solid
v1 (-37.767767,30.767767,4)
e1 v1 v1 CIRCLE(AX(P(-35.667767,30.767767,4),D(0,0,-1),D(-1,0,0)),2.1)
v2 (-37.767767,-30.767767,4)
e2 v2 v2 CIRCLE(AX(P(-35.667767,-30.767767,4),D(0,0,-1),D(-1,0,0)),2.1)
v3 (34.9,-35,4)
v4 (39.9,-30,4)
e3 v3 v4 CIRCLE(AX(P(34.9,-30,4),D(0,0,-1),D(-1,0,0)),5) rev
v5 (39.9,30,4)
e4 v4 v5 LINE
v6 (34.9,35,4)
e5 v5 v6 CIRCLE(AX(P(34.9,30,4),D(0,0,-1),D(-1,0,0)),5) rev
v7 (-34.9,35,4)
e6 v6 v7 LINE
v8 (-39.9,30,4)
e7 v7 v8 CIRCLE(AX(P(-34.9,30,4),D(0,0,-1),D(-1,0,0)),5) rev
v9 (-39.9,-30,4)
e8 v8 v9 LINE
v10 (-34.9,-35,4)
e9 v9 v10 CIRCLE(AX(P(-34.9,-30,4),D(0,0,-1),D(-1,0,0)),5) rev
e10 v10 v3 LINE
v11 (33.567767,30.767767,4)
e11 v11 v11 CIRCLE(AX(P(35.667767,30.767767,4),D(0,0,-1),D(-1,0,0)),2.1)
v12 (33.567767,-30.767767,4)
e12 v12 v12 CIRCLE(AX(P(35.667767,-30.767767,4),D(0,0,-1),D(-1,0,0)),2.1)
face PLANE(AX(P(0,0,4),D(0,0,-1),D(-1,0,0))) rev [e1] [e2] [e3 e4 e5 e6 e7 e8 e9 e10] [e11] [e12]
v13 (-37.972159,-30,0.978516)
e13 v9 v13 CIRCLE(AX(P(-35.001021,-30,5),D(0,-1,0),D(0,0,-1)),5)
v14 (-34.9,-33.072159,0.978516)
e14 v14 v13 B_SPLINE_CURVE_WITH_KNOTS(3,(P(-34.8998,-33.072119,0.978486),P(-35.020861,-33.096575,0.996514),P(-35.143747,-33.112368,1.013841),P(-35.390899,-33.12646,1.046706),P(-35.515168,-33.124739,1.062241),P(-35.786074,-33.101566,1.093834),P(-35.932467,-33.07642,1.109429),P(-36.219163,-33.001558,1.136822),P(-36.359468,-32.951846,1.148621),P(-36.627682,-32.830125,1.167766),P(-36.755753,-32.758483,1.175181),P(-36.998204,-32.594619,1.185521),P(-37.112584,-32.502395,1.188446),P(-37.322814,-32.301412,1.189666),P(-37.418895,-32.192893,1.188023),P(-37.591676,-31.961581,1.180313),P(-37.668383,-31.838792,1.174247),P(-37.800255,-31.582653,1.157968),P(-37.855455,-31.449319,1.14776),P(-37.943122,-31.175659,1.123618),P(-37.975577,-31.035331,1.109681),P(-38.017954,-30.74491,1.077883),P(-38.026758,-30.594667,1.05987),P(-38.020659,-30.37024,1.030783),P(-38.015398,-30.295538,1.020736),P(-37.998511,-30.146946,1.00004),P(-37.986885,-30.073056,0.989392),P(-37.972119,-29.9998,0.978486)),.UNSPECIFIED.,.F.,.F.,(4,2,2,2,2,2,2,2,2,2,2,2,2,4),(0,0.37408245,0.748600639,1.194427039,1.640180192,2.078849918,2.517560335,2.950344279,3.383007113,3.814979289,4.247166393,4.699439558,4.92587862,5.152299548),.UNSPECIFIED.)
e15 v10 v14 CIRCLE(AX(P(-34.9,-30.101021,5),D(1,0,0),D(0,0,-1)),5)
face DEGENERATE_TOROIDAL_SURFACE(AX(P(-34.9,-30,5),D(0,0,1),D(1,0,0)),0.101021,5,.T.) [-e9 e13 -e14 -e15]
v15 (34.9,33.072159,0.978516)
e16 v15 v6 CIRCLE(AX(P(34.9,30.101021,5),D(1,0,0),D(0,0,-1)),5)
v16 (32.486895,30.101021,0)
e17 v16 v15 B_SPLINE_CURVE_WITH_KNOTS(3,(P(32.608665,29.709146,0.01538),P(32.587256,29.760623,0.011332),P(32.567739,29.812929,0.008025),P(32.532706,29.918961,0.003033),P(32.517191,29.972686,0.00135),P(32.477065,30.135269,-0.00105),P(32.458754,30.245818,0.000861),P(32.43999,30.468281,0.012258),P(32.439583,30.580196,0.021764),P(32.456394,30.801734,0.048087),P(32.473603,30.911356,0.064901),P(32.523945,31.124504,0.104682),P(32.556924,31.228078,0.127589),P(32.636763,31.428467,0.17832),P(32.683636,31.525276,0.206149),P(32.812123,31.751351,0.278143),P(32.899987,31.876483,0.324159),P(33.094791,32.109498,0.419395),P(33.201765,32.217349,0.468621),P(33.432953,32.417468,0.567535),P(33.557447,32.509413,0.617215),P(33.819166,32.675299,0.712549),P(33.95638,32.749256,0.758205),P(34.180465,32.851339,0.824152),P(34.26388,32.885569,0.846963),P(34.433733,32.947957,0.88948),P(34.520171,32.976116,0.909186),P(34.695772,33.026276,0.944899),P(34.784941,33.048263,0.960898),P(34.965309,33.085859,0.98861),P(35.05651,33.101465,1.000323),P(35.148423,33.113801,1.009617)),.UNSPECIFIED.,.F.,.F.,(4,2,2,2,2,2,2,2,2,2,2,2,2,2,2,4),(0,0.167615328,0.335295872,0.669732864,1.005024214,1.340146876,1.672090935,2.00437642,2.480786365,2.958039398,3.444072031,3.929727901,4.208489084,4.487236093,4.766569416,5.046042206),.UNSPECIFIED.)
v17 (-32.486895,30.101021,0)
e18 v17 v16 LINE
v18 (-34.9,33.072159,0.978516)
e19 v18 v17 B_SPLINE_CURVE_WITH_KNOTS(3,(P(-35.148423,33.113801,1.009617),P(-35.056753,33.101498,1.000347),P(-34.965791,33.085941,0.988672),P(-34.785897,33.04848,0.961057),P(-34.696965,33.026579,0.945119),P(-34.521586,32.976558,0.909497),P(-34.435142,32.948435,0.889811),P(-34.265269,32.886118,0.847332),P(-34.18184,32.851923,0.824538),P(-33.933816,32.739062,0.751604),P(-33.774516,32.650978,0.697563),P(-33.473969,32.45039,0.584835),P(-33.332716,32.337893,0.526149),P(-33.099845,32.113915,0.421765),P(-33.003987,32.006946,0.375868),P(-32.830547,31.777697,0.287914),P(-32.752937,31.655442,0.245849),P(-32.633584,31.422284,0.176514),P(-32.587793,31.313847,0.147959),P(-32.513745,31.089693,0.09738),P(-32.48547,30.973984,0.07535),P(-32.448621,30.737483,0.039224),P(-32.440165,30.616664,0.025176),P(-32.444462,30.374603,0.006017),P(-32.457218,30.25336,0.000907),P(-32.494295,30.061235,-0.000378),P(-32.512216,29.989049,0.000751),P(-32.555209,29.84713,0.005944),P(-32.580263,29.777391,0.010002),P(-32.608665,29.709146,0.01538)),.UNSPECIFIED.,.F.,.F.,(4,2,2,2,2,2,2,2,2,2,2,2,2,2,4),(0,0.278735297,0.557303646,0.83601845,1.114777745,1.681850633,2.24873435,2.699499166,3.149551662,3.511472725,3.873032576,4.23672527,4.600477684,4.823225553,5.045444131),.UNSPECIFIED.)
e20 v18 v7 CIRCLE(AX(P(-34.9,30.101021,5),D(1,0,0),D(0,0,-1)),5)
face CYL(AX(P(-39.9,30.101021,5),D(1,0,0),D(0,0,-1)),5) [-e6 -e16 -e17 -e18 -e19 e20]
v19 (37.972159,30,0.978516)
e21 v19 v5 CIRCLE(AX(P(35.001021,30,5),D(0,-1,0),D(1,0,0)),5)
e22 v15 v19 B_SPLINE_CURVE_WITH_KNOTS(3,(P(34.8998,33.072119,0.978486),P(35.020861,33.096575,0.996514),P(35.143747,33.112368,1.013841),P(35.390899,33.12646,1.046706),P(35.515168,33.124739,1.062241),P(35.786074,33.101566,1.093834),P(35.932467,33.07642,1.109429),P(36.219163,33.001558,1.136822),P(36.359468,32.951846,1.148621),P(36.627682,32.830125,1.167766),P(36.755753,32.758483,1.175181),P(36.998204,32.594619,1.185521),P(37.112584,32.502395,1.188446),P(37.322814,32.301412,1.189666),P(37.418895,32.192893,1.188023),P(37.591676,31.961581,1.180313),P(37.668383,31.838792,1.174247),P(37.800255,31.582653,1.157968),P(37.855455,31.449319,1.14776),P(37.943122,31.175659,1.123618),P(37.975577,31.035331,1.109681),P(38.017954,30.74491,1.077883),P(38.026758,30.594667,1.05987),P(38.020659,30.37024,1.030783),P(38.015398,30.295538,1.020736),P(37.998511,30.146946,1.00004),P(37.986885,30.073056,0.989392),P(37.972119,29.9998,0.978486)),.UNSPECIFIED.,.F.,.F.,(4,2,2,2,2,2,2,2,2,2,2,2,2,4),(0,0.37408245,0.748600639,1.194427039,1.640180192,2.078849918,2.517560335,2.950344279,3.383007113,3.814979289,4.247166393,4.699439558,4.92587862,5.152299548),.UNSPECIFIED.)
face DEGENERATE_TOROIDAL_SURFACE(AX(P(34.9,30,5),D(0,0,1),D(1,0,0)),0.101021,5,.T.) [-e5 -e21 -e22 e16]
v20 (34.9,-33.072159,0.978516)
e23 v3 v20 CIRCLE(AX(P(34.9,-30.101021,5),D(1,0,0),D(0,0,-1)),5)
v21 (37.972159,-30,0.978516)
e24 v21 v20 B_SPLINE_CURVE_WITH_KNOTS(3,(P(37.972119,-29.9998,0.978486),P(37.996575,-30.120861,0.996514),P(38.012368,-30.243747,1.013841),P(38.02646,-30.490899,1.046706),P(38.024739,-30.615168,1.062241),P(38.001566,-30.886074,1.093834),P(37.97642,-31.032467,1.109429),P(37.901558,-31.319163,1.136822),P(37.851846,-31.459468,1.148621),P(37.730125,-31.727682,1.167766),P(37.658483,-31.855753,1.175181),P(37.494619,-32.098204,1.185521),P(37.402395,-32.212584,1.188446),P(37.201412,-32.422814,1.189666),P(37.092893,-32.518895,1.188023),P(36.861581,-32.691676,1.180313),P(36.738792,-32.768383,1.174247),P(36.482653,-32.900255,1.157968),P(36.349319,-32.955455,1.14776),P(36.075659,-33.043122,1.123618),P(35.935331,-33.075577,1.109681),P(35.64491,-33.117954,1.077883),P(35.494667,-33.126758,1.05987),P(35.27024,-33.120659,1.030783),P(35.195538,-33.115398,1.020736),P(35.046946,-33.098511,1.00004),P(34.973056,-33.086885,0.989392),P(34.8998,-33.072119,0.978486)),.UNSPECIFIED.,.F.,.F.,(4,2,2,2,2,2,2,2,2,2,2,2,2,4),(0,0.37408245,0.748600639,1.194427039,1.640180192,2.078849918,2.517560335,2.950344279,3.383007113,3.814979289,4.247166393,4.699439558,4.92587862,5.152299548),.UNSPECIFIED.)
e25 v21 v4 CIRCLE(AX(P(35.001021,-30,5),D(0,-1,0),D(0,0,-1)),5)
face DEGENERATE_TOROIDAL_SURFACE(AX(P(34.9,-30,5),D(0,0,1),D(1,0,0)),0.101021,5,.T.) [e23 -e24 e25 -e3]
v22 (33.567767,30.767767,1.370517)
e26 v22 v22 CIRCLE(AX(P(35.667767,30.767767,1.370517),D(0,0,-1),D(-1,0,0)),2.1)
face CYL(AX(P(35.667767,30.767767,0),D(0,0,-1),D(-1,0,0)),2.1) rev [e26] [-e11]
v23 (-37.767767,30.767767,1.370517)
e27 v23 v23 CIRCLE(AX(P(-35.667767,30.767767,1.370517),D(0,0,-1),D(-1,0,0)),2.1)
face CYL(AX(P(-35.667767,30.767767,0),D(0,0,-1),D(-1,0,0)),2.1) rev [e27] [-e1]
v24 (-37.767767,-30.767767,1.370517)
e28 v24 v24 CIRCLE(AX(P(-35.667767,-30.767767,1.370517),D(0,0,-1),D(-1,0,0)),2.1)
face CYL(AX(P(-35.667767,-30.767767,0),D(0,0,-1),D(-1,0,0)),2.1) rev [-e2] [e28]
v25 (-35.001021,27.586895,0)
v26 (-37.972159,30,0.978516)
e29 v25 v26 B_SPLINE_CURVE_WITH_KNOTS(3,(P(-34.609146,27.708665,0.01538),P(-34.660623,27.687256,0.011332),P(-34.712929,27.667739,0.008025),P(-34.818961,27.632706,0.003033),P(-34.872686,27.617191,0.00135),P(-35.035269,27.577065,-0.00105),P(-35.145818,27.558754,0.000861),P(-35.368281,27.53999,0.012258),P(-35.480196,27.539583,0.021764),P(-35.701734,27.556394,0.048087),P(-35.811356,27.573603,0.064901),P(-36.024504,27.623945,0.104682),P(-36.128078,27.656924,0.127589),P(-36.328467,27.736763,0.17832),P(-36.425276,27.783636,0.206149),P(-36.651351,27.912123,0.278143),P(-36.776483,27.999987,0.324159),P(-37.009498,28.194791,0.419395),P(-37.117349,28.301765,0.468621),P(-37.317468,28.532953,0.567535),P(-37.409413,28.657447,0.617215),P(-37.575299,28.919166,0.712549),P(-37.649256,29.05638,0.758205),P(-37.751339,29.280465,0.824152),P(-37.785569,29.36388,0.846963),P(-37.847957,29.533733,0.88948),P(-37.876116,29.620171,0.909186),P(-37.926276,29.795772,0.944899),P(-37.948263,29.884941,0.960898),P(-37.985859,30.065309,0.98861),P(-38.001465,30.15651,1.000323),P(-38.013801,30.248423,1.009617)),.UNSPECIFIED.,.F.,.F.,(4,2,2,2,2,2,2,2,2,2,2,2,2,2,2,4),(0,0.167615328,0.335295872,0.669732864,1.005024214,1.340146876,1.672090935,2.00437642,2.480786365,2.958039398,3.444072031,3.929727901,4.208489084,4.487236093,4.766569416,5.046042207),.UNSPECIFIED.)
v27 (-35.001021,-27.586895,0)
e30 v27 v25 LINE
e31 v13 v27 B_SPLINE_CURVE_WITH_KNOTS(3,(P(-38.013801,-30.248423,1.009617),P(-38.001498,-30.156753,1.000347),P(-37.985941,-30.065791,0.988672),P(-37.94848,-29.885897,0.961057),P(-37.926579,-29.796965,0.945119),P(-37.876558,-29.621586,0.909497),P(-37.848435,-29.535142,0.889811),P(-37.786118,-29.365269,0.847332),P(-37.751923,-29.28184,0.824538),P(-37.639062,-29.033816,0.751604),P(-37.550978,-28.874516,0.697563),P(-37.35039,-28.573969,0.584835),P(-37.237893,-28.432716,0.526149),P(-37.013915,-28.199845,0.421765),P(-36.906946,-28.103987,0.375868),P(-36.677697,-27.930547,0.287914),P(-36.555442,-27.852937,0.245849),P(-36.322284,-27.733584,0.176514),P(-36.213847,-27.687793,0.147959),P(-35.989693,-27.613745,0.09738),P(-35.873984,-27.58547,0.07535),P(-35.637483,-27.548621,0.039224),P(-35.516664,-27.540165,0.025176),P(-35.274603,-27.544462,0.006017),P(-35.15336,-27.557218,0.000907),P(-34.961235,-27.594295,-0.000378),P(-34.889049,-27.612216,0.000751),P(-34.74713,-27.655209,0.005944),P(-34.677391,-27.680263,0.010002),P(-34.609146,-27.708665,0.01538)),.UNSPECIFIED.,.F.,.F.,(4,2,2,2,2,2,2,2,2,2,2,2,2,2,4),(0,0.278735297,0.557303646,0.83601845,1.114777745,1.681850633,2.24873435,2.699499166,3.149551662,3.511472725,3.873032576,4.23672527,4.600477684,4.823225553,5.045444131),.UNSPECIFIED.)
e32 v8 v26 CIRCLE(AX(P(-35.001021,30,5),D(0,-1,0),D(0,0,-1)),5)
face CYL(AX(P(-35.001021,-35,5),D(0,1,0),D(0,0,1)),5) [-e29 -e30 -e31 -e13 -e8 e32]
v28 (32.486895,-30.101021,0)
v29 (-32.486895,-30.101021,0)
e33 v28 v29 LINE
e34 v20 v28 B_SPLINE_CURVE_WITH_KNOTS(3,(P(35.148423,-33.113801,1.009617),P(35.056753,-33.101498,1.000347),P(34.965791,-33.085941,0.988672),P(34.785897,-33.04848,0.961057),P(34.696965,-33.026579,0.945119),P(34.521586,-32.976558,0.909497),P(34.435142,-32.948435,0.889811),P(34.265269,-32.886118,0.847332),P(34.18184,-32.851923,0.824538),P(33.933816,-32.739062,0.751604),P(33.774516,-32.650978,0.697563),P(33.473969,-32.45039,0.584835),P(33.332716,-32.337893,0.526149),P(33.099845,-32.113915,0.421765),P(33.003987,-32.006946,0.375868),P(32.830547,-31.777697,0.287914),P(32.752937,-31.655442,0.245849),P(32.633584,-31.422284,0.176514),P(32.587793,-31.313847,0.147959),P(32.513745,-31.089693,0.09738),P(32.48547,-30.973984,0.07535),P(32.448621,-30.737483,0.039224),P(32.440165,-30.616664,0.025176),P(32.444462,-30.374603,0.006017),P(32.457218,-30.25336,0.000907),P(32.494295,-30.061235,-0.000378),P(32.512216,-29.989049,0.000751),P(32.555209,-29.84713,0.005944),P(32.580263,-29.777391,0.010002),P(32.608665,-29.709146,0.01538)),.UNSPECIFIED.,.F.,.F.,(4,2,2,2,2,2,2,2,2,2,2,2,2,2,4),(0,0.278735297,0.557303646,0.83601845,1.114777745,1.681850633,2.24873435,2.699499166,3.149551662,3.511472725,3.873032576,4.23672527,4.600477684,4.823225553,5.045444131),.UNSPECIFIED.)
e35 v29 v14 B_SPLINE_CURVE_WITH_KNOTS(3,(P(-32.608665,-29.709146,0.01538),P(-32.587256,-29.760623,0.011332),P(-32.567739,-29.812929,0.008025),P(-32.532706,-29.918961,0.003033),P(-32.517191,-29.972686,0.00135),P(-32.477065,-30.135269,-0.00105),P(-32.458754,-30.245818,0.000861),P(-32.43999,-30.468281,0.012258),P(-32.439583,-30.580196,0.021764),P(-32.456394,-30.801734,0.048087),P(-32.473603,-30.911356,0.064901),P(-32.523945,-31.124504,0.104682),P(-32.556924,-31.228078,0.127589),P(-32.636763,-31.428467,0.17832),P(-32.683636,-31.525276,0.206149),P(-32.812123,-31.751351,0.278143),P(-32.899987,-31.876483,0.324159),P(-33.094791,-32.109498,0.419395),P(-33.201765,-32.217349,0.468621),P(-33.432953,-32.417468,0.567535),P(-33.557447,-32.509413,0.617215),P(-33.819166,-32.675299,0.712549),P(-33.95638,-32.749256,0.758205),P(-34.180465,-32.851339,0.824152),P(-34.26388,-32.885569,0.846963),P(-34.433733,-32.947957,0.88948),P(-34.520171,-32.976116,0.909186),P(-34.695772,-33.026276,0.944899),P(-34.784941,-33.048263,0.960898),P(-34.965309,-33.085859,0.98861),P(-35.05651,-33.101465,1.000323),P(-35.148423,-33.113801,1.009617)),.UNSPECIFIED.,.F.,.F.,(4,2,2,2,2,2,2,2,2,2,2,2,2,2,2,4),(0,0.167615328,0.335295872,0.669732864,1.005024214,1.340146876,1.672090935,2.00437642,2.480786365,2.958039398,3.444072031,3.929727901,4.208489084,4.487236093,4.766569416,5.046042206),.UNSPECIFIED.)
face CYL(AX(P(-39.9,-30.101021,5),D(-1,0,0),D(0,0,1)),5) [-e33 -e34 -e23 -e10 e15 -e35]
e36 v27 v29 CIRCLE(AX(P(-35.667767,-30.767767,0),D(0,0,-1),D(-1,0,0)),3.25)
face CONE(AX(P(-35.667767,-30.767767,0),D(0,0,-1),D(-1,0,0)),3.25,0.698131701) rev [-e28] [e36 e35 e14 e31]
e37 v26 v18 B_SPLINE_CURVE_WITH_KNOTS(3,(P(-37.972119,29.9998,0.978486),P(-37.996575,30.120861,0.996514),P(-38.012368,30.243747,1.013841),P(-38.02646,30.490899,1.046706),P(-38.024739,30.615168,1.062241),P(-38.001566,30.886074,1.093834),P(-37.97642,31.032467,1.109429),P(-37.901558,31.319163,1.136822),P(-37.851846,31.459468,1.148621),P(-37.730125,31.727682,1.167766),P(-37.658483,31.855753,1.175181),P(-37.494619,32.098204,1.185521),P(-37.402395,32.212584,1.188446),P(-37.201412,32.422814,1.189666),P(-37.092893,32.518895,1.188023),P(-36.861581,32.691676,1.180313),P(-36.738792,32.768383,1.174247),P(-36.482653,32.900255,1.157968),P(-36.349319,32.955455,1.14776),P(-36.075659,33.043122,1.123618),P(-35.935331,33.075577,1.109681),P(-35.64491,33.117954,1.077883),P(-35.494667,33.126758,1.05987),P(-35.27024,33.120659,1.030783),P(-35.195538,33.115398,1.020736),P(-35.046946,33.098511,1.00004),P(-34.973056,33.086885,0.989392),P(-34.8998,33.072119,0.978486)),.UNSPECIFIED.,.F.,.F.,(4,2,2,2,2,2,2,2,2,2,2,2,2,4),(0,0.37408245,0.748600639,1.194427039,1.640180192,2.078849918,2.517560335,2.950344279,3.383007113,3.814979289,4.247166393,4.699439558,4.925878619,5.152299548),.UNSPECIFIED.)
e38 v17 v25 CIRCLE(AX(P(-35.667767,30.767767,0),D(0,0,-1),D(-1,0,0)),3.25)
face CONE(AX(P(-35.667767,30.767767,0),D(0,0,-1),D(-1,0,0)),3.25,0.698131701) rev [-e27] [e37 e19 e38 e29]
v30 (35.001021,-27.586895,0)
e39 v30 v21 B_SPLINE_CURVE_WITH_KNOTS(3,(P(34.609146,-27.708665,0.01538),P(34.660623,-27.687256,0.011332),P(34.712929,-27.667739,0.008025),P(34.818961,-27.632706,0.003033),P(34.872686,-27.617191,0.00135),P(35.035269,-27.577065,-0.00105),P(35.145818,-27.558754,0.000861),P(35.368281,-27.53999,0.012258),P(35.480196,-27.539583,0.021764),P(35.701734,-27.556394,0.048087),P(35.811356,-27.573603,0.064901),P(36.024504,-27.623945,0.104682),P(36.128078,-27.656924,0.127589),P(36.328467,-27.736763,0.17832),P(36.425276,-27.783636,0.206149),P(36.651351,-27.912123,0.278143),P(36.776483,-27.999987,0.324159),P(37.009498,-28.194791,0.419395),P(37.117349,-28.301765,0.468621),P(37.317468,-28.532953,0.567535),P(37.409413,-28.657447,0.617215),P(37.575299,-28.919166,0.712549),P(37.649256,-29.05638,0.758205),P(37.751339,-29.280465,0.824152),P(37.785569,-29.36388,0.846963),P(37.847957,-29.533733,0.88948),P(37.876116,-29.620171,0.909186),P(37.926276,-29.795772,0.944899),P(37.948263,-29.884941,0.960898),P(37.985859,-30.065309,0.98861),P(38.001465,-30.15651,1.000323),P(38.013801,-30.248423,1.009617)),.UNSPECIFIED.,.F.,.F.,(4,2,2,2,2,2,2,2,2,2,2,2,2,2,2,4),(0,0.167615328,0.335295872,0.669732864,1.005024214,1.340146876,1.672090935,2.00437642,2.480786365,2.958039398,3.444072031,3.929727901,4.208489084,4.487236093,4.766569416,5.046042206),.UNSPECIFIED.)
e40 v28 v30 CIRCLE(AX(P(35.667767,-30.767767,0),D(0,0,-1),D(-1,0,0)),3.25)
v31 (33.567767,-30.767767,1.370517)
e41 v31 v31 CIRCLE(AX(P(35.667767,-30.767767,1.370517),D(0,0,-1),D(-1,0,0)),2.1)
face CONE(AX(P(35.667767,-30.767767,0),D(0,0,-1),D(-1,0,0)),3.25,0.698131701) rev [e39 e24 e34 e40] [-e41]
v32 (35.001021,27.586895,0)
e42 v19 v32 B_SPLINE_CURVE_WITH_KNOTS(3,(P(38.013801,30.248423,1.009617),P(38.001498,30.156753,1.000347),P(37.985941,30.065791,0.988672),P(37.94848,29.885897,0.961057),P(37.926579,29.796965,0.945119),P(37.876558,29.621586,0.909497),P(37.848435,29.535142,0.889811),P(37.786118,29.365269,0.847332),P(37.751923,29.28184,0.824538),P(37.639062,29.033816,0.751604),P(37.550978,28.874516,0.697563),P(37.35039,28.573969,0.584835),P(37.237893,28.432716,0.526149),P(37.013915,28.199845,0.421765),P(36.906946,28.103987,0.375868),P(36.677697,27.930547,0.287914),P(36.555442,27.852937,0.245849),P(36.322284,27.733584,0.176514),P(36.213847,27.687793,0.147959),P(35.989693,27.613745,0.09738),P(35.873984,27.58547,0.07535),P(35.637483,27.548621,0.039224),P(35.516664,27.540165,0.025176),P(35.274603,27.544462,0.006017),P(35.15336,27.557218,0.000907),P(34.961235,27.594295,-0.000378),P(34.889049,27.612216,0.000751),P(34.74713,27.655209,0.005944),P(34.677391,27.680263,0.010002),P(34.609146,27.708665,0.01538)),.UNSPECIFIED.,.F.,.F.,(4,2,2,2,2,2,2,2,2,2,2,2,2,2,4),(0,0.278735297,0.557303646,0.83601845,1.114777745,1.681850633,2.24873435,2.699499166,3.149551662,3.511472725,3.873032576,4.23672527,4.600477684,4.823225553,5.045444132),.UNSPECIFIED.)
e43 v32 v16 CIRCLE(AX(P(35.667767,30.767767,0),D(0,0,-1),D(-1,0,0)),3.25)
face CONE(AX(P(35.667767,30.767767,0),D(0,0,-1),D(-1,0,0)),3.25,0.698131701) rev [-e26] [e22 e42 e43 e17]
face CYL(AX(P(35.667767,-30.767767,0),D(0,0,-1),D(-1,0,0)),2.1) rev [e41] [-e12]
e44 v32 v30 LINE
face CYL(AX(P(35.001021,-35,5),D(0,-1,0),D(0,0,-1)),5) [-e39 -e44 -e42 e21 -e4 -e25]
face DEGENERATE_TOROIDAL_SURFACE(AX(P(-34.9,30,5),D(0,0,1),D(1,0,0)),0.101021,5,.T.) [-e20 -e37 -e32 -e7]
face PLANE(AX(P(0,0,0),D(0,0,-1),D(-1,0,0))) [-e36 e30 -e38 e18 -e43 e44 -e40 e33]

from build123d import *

# Parameters (mm, degrees)
IZIM1_W                     = 79.8
IZIM1_H                     = 70
Y_KSEKLIK_EKSTR_ZYON1_DEPTH = 4
RADYUS1_R                   = 5
RADYUS2_R                   = 5
DELIK1_D                    = 4.2
DELIK1_DEPTH                = 5
DELIK1_CSINK_D              = 6.5
DELIK1_CSINK_ANGLE          = 80


with BuildPart() as part:
    # Çizim1 → Yükseklik-Ekstrüzyon1 (new body)
    with BuildSketch(Plane.XY):
        Rectangle(IZIM1_W, IZIM1_H)
    extrude(amount=Y_KSEKLIK_EKSTR_ZYON1_DEPTH)

    # Radyus1
    radyus1_edges = [part.edges().sort_by_distance(p)[0] for p in [
        (39.9, -35, 2),
        (-39.9, -35, 2),
        (-39.9, 35, 2),
        (39.9, 35, 2),
    ]]
    fillet(radyus1_edges, radius=RADYUS1_R)

    # Radyus2
    # the kernel refuses this fillet: 5 mm, written as the material it takes off along each edge
    with BuildSketch(Plane(origin=(34.9, -30, 0), x_dir=(0, -1, 0), z_dir=(-1, 0, 0))) as radyus2_piece_1:
        with BuildLine():
            CenterArc((0.101020514, 5), RADYUS2_R, 270, 78.463040967)
            Line((5, 4), (5.09797959, 3.98))
            ThreePointArc((5.09797959, 3.98), (5.1, 2), (5.1, 0))
            Line((5.1, 0), (5, -0.1))
            Line((5, -0.1), (0.101020514, -0.1))
            Line((0.101020514, -0.1), (0.101020514, 0))
        make_face()
    revolve(axis=Axis((34.9, -30, 0), (0, 0, 1)), revolution_arc=90, mode=Mode.SUBTRACT)
    with BuildSketch(Plane(origin=(-34.9, -35, 0), x_dir=(0, 1.5720758028687172e-12, 1.0), z_dir=(1, 0, 0))) as radyus2_piece_2:
        with BuildLine():
            CenterArc((5, -4.898979486), RADYUS2_R, 101.536959033, 78.463040967)
            Line((0, -4.898979486), (-0.1, -4.898979486))
            Line((-0.1, -4.898979486), (-0.1, 0))
            Line((-0.1, 0), (0, 0.1))
            ThreePointArc((0, 0.1), (2, 0.1), (3.98, 0.09797959))
            Line((3.98, 0.09797959), (4, 0))
        make_face()
    extrude(amount=69.8, mode=Mode.SUBTRACT)
    with BuildSketch(Plane(origin=(-34.9, -30, 0), x_dir=(0, -1, 0), z_dir=(1, 0, 0))) as radyus2_piece_3:
        with BuildLine():
            CenterArc((0.101020514, -5), RADYUS2_R, 11.536959033, 78.463040967)
            Line((5, -4), (5.09797959, -3.98))
            ThreePointArc((5.09797959, -3.98), (5.1, -2), (5.1, 0))
            Line((5.1, 0), (5, 0.1))
            Line((5, 0.1), (0.101020514, 0.1))
            Line((0.101020514, 0.1), (0.101020514, 0))
        make_face()
    revolve(axis=Axis((-34.9, -30, 0), (0, 0, -1)), revolution_arc=90, mode=Mode.SUBTRACT)
    with BuildSketch(Plane(origin=(-39.9, 30, 0), x_dir=(1, 0, 0), z_dir=(0, -1, 0)), Plane(origin=(39.9, -30, 0), x_dir=(-1, 0, 0), z_dir=(0, 1, 0))) as radyus2_piece_4:
        with BuildLine():
            CenterArc((4.898979486, 5), RADYUS2_R, 191.536959033, 78.463040967)
            Line((0, 4), (-0.09797959, 3.98))
            ThreePointArc((-0.09797959, 3.98), (-0.1, 2), (-0.1, 0))
            Line((-0.1, 0), (0, -0.1))
            Line((0, -0.1), (4.898979486, -0.1))
            Line((4.898979486, -0.1), (4.898979486, 0))
        make_face()
    extrude(amount=60, mode=Mode.SUBTRACT)
    with BuildSketch(Plane(origin=(-34.9, 30, 0), x_dir=(0, 1, 0), z_dir=(1, 0, 0))) as radyus2_piece_5:
        with BuildLine():
            CenterArc((0.101020514, 5), RADYUS2_R, 270, 78.463040967)
            Line((5, 4), (5.09797959, 3.98))
            ThreePointArc((5.09797959, 3.98), (5.1, 2), (5.1, 0))
            Line((5.1, 0), (5, -0.1))
            Line((5, -0.1), (0.101020514, -0.1))
            Line((0.101020514, -0.1), (0.101020514, 0))
        make_face()
    revolve(axis=Axis((-34.9, 30, 0), (0, 0, 1)), revolution_arc=90, mode=Mode.SUBTRACT)
    with BuildSketch(Plane(origin=(34.9, 35, 0), x_dir=(0, -1, 0), z_dir=(-1, 0, 0))) as radyus2_piece_6:
        with BuildLine():
            CenterArc((4.898979486, 5), RADYUS2_R, 191.536959033, 78.463040967)
            Line((0, 4), (-0.09797959, 3.98))
            ThreePointArc((-0.09797959, 3.98), (-0.1, 2), (-0.1, 0))
            Line((-0.1, 0), (0, -0.1))
            Line((0, -0.1), (4.898979486, -0.1))
            Line((4.898979486, -0.1), (4.898979486, 0))
        make_face()
    extrude(amount=69.8, mode=Mode.SUBTRACT)
    with BuildSketch(Plane(origin=(34.9, 30, 0), x_dir=(1, 0, 0), z_dir=(0, -1, 0))) as radyus2_piece_7:
        with BuildLine():
            CenterArc((0.101020514, 5), RADYUS2_R, 270, 78.463040967)
            Line((5, 4), (5.09797959, 3.98))
            ThreePointArc((5.09797959, 3.98), (5.1, 2), (5.1, 0))
            Line((5.1, 0), (5, -0.1))
            Line((5, -0.1), (0.101020514, -0.1))
            Line((0.101020514, -0.1), (0.101020514, 0))
        make_face()
    revolve(axis=Axis((34.9, 30, 0), (0, 0, 1)), revolution_arc=90, mode=Mode.SUBTRACT)

    # Delik1
    with Locations(Plane(origin=(0, 0, 0), x_dir=(-1, 0, 0), z_dir=(0, 0, -1))):
        with Locations((-35.667766953, 30.767766953), (35.667766953, 30.767766953), (35.667766953, -30.767766953), (-35.667766953, -30.767766953)):
            CounterSinkHole(DELIK1_D / 2, DELIK1_CSINK_D / 2, depth=DELIK1_DEPTH, counter_sink_angle=DELIK1_CSINK_ANGLE)


solid = part.part
